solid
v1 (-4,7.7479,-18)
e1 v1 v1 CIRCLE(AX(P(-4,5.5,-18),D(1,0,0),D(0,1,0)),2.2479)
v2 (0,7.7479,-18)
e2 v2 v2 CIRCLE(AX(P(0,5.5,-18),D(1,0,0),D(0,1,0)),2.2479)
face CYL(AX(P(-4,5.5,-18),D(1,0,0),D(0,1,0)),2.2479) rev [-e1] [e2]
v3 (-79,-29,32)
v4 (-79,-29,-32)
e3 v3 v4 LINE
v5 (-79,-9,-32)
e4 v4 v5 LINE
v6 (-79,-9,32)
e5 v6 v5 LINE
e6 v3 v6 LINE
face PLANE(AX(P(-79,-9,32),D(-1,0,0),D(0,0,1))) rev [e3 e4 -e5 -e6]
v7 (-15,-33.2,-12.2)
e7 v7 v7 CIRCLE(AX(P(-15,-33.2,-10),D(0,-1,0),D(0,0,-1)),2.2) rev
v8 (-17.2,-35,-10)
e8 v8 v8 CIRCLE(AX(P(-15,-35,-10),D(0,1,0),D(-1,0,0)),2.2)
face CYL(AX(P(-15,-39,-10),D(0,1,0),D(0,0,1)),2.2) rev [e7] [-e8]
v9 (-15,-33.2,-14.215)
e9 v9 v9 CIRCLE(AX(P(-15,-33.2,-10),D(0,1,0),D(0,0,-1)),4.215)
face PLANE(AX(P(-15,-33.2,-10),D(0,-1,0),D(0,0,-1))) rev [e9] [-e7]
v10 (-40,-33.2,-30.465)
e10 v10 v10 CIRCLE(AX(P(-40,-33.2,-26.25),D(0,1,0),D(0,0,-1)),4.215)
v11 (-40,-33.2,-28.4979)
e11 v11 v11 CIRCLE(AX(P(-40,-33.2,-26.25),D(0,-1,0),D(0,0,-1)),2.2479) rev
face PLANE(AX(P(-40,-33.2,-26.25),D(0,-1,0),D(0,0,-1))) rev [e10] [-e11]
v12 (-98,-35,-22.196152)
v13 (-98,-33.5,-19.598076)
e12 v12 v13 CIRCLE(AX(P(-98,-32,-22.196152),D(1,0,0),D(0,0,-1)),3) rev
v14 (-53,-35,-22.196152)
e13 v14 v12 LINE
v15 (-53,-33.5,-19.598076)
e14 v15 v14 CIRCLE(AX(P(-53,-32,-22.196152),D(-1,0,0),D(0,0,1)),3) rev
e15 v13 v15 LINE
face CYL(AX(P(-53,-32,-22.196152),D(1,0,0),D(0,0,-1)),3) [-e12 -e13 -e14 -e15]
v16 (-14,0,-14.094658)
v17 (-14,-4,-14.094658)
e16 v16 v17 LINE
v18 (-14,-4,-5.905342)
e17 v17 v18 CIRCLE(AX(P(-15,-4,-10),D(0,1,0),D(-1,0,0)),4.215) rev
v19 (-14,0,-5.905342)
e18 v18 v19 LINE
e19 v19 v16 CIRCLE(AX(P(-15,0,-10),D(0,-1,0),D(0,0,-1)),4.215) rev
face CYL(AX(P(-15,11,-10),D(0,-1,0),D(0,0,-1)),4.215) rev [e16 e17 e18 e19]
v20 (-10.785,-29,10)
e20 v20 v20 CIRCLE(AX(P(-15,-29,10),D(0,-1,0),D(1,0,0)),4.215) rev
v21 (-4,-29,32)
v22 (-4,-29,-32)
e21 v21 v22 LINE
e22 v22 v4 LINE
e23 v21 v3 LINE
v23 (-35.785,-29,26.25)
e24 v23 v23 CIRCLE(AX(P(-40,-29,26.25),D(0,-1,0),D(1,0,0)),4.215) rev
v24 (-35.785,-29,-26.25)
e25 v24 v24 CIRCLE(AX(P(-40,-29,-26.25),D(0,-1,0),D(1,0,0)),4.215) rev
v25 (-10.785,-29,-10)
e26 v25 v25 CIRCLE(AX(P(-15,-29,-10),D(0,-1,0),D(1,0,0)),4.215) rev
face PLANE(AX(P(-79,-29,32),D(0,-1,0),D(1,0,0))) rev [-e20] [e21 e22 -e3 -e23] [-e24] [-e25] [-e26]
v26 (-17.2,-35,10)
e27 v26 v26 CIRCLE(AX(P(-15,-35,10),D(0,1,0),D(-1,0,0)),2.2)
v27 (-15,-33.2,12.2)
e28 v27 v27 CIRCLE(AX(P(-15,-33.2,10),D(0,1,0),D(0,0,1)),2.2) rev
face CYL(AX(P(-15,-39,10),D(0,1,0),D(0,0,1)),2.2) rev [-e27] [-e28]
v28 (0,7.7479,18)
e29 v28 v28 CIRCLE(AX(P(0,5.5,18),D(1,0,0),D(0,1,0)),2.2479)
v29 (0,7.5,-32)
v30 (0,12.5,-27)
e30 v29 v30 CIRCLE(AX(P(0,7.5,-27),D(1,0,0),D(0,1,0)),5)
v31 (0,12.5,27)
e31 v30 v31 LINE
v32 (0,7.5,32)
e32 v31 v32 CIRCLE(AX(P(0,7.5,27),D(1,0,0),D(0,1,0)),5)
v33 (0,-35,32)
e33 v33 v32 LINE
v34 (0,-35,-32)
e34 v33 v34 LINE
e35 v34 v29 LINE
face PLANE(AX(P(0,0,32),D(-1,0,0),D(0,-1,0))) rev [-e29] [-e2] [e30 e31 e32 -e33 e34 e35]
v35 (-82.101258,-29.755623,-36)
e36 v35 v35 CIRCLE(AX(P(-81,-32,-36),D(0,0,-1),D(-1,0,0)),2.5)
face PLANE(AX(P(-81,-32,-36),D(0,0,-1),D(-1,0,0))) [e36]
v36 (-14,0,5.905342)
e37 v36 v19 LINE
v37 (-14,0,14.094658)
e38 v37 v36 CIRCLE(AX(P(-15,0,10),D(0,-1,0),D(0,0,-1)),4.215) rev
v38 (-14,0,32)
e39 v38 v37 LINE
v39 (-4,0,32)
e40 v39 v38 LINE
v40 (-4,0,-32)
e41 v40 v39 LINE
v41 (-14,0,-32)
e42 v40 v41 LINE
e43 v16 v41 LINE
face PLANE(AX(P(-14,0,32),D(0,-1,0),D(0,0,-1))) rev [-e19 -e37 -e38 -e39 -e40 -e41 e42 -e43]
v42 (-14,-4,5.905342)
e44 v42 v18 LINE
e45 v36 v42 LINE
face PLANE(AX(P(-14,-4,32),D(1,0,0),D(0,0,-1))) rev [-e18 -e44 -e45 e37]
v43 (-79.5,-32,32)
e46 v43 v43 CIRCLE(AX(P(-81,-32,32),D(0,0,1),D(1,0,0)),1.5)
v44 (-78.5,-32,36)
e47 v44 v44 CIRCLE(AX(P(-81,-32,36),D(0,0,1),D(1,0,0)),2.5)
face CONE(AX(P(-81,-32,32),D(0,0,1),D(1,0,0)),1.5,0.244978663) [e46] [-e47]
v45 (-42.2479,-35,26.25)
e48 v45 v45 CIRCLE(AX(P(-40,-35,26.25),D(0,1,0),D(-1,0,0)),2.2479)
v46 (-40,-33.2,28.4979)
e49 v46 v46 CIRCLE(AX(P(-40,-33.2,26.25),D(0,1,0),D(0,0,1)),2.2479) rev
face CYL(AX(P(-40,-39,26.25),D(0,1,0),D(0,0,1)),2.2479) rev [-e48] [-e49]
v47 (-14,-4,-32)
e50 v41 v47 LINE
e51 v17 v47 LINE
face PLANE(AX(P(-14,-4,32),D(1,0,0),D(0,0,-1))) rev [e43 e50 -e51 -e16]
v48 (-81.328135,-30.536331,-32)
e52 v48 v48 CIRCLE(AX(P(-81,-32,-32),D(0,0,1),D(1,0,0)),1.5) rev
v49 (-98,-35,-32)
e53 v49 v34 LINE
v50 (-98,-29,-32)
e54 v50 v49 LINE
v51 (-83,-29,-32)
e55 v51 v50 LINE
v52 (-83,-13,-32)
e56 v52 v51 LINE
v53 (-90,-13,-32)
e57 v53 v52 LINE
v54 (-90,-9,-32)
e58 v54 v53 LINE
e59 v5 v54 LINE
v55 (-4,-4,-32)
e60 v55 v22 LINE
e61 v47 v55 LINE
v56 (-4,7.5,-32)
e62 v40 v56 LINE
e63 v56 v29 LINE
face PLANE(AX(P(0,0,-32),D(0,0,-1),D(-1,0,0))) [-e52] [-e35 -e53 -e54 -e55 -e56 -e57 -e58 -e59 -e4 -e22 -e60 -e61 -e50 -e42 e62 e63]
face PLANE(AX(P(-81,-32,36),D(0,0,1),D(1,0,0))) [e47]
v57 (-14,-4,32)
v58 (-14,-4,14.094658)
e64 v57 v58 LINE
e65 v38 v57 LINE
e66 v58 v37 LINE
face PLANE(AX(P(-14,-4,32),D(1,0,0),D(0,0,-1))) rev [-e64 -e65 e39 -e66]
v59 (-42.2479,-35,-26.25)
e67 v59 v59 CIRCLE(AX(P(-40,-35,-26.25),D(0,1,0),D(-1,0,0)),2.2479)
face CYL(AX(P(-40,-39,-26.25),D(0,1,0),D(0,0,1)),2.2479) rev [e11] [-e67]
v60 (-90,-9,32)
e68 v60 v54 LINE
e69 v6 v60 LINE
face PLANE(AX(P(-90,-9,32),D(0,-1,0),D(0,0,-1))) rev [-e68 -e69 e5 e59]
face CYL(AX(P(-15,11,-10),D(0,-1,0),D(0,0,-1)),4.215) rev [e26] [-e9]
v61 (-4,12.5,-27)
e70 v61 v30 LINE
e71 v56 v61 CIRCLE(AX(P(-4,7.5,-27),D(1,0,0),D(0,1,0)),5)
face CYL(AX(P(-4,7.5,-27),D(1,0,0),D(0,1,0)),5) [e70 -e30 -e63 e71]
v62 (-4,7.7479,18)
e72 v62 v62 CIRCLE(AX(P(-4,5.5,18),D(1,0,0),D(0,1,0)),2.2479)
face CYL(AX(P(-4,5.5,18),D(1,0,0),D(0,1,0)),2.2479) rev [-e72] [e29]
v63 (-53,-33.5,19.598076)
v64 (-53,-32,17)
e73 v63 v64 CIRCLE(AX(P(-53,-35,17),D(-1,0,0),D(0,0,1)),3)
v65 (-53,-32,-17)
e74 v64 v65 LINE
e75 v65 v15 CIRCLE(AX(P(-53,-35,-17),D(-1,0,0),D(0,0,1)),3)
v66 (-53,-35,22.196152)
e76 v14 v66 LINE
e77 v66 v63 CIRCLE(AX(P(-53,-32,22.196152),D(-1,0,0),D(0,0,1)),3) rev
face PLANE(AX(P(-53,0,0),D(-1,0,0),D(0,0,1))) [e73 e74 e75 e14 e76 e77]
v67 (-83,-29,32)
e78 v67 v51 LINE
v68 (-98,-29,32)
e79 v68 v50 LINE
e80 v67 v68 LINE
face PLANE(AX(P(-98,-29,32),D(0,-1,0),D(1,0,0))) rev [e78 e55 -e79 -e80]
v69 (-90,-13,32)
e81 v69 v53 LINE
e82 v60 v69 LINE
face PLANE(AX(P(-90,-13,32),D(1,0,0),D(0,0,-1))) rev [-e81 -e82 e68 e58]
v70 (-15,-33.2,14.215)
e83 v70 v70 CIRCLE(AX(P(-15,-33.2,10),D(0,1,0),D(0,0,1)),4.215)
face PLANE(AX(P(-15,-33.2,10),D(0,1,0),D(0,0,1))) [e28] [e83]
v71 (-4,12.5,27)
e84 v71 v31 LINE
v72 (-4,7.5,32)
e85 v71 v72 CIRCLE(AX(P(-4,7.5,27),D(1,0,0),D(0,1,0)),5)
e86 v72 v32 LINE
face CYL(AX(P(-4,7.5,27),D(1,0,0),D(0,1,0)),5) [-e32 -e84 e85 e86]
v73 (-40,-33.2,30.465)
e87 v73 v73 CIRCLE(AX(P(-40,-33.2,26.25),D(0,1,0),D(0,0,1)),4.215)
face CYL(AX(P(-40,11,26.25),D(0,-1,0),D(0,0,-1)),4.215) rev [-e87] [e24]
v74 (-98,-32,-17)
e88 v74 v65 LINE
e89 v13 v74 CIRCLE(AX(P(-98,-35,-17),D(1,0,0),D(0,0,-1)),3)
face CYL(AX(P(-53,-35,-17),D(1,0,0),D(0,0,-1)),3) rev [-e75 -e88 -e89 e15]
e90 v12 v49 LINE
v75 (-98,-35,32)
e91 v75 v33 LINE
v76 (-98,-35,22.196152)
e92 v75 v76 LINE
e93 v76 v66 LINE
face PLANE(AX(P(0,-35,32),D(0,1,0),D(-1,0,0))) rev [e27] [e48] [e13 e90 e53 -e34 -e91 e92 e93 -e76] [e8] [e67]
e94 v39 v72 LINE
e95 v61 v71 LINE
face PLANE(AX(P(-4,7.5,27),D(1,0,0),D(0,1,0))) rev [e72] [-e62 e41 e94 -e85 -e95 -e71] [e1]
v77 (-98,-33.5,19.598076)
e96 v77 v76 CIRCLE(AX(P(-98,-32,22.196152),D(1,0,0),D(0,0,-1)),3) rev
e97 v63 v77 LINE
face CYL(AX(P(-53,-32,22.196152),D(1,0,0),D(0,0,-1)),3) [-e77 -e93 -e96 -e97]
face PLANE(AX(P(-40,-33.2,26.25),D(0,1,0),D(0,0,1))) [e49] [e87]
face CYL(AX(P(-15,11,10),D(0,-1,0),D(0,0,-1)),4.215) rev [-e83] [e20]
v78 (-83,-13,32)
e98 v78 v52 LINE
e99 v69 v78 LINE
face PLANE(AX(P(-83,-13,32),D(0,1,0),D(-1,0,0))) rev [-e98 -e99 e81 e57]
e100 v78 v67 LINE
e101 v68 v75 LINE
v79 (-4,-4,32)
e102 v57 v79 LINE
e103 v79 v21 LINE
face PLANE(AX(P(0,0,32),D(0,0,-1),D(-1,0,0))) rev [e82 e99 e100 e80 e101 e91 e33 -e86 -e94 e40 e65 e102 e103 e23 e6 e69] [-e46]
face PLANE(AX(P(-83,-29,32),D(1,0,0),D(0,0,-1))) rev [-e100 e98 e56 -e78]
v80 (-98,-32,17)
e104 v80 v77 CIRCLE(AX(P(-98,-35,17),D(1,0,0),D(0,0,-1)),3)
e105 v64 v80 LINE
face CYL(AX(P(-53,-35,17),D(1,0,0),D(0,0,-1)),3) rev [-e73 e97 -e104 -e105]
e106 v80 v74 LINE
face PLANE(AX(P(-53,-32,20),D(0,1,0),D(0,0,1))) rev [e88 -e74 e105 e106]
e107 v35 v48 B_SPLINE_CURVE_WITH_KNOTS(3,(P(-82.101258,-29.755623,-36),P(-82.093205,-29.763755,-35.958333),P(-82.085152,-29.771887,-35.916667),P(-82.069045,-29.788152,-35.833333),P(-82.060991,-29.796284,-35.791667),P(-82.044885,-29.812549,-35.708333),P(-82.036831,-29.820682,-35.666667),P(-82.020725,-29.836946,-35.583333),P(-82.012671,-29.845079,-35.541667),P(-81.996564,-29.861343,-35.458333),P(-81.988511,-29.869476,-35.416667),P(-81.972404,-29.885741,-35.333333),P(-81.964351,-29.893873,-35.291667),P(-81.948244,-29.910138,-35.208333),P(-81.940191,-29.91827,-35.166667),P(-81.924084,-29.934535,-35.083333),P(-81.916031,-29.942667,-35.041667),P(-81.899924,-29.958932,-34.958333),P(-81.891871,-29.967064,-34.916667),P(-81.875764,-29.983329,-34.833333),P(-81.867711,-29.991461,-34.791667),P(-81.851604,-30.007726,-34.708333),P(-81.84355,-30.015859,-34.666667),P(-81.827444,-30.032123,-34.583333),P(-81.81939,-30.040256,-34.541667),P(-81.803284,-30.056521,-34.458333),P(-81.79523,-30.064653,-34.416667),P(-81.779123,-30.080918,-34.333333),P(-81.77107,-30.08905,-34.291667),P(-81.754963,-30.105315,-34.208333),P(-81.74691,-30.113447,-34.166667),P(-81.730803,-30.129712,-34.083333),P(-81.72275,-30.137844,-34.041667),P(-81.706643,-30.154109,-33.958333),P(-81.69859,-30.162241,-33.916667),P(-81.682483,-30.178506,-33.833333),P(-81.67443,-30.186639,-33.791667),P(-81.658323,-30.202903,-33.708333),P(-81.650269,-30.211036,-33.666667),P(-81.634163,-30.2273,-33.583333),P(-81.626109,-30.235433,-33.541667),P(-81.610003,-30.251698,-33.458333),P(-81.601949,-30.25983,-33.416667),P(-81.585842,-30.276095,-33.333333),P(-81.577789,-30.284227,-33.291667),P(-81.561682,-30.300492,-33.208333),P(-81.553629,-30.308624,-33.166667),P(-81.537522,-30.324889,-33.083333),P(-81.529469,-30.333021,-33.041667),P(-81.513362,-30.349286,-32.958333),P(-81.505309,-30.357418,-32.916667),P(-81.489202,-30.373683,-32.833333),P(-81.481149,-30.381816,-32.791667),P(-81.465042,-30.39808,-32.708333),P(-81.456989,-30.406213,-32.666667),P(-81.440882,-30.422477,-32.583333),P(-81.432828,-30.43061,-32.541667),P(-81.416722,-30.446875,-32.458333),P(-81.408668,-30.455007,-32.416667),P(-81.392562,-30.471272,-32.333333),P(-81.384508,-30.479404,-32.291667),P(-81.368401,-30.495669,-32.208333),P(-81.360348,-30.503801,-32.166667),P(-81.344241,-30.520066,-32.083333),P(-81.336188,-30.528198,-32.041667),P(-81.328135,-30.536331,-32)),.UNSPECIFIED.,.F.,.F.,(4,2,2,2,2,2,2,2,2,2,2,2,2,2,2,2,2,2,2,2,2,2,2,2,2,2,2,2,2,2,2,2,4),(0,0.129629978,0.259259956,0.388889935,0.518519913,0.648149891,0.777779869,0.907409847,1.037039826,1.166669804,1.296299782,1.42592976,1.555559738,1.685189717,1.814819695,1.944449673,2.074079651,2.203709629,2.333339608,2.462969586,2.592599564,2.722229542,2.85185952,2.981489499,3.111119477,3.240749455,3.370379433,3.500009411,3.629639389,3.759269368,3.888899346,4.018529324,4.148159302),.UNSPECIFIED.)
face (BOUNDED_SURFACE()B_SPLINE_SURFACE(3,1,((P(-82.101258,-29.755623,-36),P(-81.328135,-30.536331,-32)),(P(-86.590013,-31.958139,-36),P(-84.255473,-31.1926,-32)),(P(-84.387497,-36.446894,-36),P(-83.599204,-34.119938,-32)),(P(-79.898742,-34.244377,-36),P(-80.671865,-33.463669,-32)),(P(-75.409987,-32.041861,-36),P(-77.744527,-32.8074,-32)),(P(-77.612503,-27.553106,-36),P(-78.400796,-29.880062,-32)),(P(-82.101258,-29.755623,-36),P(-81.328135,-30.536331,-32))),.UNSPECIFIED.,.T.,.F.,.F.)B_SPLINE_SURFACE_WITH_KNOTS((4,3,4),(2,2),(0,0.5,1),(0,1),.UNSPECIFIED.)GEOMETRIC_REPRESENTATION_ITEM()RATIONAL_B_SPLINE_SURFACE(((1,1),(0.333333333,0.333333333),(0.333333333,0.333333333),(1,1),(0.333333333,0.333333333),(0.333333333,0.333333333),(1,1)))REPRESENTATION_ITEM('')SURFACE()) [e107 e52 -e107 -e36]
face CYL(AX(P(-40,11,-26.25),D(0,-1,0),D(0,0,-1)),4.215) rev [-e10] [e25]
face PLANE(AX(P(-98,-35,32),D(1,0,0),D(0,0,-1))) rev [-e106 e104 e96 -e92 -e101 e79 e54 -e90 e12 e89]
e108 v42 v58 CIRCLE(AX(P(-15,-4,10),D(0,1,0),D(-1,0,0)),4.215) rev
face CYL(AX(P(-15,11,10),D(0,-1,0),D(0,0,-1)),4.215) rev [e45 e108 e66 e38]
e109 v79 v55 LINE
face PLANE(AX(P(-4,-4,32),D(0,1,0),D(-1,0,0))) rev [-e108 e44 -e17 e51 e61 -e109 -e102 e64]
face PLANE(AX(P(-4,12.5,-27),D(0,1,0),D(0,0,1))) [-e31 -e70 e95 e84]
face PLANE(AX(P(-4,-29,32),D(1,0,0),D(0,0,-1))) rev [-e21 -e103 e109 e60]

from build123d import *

# Parameters (mm, degrees)
EXTRUDE_BASE_DEPTH              = 32
SKETCH2_R                       = 2.2
SKETCH2_R_2                     = 2.2479
CUT_BOLT_HOLES_DEPTH            = 10
CUT_BOLT_HEAD_INSETS_DEPTH      = 40
CUT_BOLT_HEAD_INSETS_DEPTH_BACK = 4.2
SKETCH3_R                       = 4.215
SKETCH4_W                       = 40
SKETCH4_H                       = 3
CUT_TOP_CLEARANCE_SLOT_DEPTH    = 45
FILLET_CLEARANCE_SLOT_PT_1_R    = 3
FILLET_CLEARANCE_SLOT_PT_2_R    = 3
SKETCH5_R                       = 1.5
BOSS_EXTRUDE1_DEPTH             = 4
SKETCH6_R                       = 2.5
SKETCH7_R                       = 1.5
BOSS_EXTRUDE2_DEPTH             = 4
SKETCH9_R                       = 2.2479
BOSS_EXTRUDE3_DEPTH             = 4


with BuildPart() as part:
    # Sketch1 → Extrude-Base (new, symmetric)
    with BuildSketch(Plane.XY):
        Polygon((-14, 0), (0, 0), (0, -35), (-98, -35), (-98, -29), (-83, -29), (-83, -13), (-90, -13), (-90, -9), (-79, -9), (-79, -29), (-4, -29), (-4, -4), (-14, -4), align=None)
    extrude(amount=EXTRUDE_BASE_DEPTH, both=True)

    # Sketch2 → Cut-Bolt Holes (cut)
    with BuildSketch(Plane(origin=(0, -29, 0), x_dir=(1, 0, 0), z_dir=(0, 1, 0))):
        with Locations(Location((-15, -10, 0), (0, 0, 270))):
            Circle(SKETCH2_R)
        with Locations(Location((-15, 10, 0), (0, 0, 180))):
            Circle(SKETCH2_R)
        with Locations(Location((-40, 26.25, 0), (0, 0, 270))):
            Circle(SKETCH2_R_2)
        with Locations(Location((-40, -26.25, 0), (0, 0, 270))):
            Circle(SKETCH2_R_2)
    extrude(amount=-CUT_BOLT_HOLES_DEPTH, mode=Mode.SUBTRACT)

    # Sketch3 → Cut-Bolt Head Insets (cut, two sides: drawn at the far end of the back side and taken through both)
    with BuildSketch(Plane(origin=(0, -29, 0), x_dir=(1, 0, 0), z_dir=(0, 1, 0)).offset(-CUT_BOLT_HEAD_INSETS_DEPTH_BACK)):
        with Locations((-15, -10)):
            Circle(SKETCH3_R)
        with Locations((-40, -26.25)):
            Circle(SKETCH3_R)
        with Locations(Location((-15, 10, 0), (0, 0, 90))):
            Circle(SKETCH3_R)
        with Locations(Location((-40, 26.25, 0), (0, 0, 90))):
            Circle(SKETCH3_R)
    extrude(amount=CUT_BOLT_HEAD_INSETS_DEPTH + CUT_BOLT_HEAD_INSETS_DEPTH_BACK, mode=Mode.SUBTRACT)

    # Sketch4 → Cut-Top Clearance Slot (cut)
    with BuildSketch(Plane.ZY.offset(98)):
        with Locations((0, -33.5)):
            Rectangle(SKETCH4_W, SKETCH4_H)
    extrude(amount=-CUT_TOP_CLEARANCE_SLOT_DEPTH, mode=Mode.SUBTRACT)

    # Fillet-Clearance Slot Pt 1
    fillet_clearance_slot_pt_1_edges = [part.edges().sort_by_distance(p)[0] for p in [
        (-75.5, -32, 20),
        (-75.5, -32, -20),
    ]]
    fillet(fillet_clearance_slot_pt_1_edges, radius=FILLET_CLEARANCE_SLOT_PT_1_R - 0.0001)  # a hair under: the kernel refuses the full size

    # Fillet-Clearance Slot Pt 2
    # the kernel refuses this fillet: 3 mm, written as the material it takes off along each edge
    with BuildSketch(Plane(origin=(-103.490486718, -35, 20), x_dir=(0, 0, 1), z_dir=(1, 0, 0))) as fillet_clearance_slot_pt_2_piece_1:
        with BuildLine():
            CenterArc((2.196194687, -3), FILLET_CLEARANCE_SLOT_PT_2_R, 90, 60.000551337)
            Line((-0.401895958, -1.500025), (-0.661705022, -1.3500275))
            ThreePointArc((-0.661705022, -1.3500275), (-0.3, -0.0001), (-0.3, 0))
            Line((-0.3, 0), (0, 0.3))
            Line((0, 0.3), (2.196194687, 0.3))
            Line((2.196194687, 0.3), (2.196194687, 0))
        make_face()
    extrude(amount=50.490486718, mode=Mode.SUBTRACT)
    with BuildSketch(Plane(origin=(-103.490486718, -35, -20), x_dir=(0, 0.9659313848535173, 0.25879829936644894), z_dir=(1, 0, 0))) as fillet_clearance_slot_pt_2_piece_2:
        with BuildLine():
            CenterArc((2.329422704, -2.897768274), FILLET_CLEARANCE_SLOT_PT_2_R, 105.000679234, 60.000551337)
            Line((-0.56837145, -2.121373376), (-0.858150866, -2.043733886))
            Line((-0.858150866, -2.043733886), (-0.289779415, 0.07763949))
            Line((-0.289779415, 0.07763949), (0.07763949, 0.289779415))
            ThreePointArc((0.07763949, 0.289779415), (0.077736083, 0.289753536), (1.475282068, 0.289776827))
            Line((1.475282068, 0.289776827), (1.552931216, 0))
        make_face()
    extrude(amount=50.490486718, mode=Mode.SUBTRACT)

    # Sketch5 → Boss-Extrude1 (add)
    with BuildSketch(Plane.XY.offset(32)):
        with Locations(Location((-81, -32, 0), (0, 0, 180))):
            Circle(SKETCH5_R)
    extrude(amount=BOSS_EXTRUDE1_DEPTH)

    # Sketch6 → section 1 of loft2
    with BuildSketch(Plane.XY.offset(36), mode=Mode.PRIVATE) as loft2_s1:
        with Locations((-81, -32)):
            Circle(SKETCH6_R)
    # loft up to a face of the part (loft2)
    loft([Face(Wire([part.edges().sort_by_distance((-79.973179341, -33.093452941, 32))[0]])), loft2_s1.sketch])

    # Sketch7 → Boss-Extrude2 (add)
    with BuildSketch(Plane(origin=(0, 0, -32), x_dir=(-1, 0, 0), z_dir=(0, 0, -1))):
        with Locations((81, -32)):
            Circle(SKETCH7_R)
    extrude(amount=BOSS_EXTRUDE2_DEPTH)

    # Loft4: read off the stored shape, not the designer's step
    # Loft4: loft between two sections, ruled curve by curve
    loft4_from = [
        Edge.make_bspline([(-82.101258326, -29.755622559, -36), (-86.590013209, -31.95813921, -36), (-84.387496557, -36.446894093, -36), (-79.898741674, -34.244377441, -36), (-75.409986791, -32.04186079, -36), (-77.612503443, -27.553105907, -36), (-82.101258326, -29.755622559, -36)], [0, 0, 0, 0, 0.5, 0.5, 0.5, 1, 1, 1, 1], 3, [1, 0.333333333, 0.333333333, 1, 0.333333333, 0.333333333, 1]),
    ]
    loft4_to = [
        Edge.make_bspline([(-81.328134577, -30.536330741, -32), (-84.255473095, -31.192599896, -32), (-83.59920394, -34.119938413, -32), (-80.671865423, -33.463669259, -32), (-77.744526905, -32.807400104, -32), (-78.40079606, -29.880061587, -32), (-81.328134577, -30.536330741, -32)], [0, 0, 0, 0, 0.5, 0.5, 0.5, 1, 1, 1, 1], 3, [1, 0.333333333, 0.333333333, 1, 0.333333333, 0.333333333, 1]),
    ]
    loft4 = Solid(Shell([*[Face.make_surface_from_curves(loft4_from[k], loft4_to[k]) for k in range(1)], Face(Wire(loft4_from)), Face(Wire(loft4_to))]))
    add(loft4)

    # Sketch9 → Boss-Extrude3 (add)
    with BuildSketch(Plane(origin=(0, 0, 0), x_dir=(0, 0, -1), z_dir=(1, 0, 0))):
        with BuildLine():
            Line((32, 0), (-32, 0))
            Line((-32, 0), (-32, 7.5))
            ThreePointArc((-32, 7.5), (-30.535533906, 11.035533906), (-27, 12.5))
            Line((-27, 12.5), (27, 12.5))
            ThreePointArc((27, 12.5), (30.535533906, 11.035533906), (32, 7.5))
            Line((32, 7.5), (32, 0))
        make_face()
        with Locations(Location((-18, 5.5, 0), (0, 0, 90))):
            Circle(SKETCH9_R, mode=Mode.SUBTRACT)
        with Locations(Location((18, 5.5, 0), (0, 0, 90))):
            Circle(SKETCH9_R, mode=Mode.SUBTRACT)
    extrude(amount=-BOSS_EXTRUDE3_DEPTH)


solid = part.part
